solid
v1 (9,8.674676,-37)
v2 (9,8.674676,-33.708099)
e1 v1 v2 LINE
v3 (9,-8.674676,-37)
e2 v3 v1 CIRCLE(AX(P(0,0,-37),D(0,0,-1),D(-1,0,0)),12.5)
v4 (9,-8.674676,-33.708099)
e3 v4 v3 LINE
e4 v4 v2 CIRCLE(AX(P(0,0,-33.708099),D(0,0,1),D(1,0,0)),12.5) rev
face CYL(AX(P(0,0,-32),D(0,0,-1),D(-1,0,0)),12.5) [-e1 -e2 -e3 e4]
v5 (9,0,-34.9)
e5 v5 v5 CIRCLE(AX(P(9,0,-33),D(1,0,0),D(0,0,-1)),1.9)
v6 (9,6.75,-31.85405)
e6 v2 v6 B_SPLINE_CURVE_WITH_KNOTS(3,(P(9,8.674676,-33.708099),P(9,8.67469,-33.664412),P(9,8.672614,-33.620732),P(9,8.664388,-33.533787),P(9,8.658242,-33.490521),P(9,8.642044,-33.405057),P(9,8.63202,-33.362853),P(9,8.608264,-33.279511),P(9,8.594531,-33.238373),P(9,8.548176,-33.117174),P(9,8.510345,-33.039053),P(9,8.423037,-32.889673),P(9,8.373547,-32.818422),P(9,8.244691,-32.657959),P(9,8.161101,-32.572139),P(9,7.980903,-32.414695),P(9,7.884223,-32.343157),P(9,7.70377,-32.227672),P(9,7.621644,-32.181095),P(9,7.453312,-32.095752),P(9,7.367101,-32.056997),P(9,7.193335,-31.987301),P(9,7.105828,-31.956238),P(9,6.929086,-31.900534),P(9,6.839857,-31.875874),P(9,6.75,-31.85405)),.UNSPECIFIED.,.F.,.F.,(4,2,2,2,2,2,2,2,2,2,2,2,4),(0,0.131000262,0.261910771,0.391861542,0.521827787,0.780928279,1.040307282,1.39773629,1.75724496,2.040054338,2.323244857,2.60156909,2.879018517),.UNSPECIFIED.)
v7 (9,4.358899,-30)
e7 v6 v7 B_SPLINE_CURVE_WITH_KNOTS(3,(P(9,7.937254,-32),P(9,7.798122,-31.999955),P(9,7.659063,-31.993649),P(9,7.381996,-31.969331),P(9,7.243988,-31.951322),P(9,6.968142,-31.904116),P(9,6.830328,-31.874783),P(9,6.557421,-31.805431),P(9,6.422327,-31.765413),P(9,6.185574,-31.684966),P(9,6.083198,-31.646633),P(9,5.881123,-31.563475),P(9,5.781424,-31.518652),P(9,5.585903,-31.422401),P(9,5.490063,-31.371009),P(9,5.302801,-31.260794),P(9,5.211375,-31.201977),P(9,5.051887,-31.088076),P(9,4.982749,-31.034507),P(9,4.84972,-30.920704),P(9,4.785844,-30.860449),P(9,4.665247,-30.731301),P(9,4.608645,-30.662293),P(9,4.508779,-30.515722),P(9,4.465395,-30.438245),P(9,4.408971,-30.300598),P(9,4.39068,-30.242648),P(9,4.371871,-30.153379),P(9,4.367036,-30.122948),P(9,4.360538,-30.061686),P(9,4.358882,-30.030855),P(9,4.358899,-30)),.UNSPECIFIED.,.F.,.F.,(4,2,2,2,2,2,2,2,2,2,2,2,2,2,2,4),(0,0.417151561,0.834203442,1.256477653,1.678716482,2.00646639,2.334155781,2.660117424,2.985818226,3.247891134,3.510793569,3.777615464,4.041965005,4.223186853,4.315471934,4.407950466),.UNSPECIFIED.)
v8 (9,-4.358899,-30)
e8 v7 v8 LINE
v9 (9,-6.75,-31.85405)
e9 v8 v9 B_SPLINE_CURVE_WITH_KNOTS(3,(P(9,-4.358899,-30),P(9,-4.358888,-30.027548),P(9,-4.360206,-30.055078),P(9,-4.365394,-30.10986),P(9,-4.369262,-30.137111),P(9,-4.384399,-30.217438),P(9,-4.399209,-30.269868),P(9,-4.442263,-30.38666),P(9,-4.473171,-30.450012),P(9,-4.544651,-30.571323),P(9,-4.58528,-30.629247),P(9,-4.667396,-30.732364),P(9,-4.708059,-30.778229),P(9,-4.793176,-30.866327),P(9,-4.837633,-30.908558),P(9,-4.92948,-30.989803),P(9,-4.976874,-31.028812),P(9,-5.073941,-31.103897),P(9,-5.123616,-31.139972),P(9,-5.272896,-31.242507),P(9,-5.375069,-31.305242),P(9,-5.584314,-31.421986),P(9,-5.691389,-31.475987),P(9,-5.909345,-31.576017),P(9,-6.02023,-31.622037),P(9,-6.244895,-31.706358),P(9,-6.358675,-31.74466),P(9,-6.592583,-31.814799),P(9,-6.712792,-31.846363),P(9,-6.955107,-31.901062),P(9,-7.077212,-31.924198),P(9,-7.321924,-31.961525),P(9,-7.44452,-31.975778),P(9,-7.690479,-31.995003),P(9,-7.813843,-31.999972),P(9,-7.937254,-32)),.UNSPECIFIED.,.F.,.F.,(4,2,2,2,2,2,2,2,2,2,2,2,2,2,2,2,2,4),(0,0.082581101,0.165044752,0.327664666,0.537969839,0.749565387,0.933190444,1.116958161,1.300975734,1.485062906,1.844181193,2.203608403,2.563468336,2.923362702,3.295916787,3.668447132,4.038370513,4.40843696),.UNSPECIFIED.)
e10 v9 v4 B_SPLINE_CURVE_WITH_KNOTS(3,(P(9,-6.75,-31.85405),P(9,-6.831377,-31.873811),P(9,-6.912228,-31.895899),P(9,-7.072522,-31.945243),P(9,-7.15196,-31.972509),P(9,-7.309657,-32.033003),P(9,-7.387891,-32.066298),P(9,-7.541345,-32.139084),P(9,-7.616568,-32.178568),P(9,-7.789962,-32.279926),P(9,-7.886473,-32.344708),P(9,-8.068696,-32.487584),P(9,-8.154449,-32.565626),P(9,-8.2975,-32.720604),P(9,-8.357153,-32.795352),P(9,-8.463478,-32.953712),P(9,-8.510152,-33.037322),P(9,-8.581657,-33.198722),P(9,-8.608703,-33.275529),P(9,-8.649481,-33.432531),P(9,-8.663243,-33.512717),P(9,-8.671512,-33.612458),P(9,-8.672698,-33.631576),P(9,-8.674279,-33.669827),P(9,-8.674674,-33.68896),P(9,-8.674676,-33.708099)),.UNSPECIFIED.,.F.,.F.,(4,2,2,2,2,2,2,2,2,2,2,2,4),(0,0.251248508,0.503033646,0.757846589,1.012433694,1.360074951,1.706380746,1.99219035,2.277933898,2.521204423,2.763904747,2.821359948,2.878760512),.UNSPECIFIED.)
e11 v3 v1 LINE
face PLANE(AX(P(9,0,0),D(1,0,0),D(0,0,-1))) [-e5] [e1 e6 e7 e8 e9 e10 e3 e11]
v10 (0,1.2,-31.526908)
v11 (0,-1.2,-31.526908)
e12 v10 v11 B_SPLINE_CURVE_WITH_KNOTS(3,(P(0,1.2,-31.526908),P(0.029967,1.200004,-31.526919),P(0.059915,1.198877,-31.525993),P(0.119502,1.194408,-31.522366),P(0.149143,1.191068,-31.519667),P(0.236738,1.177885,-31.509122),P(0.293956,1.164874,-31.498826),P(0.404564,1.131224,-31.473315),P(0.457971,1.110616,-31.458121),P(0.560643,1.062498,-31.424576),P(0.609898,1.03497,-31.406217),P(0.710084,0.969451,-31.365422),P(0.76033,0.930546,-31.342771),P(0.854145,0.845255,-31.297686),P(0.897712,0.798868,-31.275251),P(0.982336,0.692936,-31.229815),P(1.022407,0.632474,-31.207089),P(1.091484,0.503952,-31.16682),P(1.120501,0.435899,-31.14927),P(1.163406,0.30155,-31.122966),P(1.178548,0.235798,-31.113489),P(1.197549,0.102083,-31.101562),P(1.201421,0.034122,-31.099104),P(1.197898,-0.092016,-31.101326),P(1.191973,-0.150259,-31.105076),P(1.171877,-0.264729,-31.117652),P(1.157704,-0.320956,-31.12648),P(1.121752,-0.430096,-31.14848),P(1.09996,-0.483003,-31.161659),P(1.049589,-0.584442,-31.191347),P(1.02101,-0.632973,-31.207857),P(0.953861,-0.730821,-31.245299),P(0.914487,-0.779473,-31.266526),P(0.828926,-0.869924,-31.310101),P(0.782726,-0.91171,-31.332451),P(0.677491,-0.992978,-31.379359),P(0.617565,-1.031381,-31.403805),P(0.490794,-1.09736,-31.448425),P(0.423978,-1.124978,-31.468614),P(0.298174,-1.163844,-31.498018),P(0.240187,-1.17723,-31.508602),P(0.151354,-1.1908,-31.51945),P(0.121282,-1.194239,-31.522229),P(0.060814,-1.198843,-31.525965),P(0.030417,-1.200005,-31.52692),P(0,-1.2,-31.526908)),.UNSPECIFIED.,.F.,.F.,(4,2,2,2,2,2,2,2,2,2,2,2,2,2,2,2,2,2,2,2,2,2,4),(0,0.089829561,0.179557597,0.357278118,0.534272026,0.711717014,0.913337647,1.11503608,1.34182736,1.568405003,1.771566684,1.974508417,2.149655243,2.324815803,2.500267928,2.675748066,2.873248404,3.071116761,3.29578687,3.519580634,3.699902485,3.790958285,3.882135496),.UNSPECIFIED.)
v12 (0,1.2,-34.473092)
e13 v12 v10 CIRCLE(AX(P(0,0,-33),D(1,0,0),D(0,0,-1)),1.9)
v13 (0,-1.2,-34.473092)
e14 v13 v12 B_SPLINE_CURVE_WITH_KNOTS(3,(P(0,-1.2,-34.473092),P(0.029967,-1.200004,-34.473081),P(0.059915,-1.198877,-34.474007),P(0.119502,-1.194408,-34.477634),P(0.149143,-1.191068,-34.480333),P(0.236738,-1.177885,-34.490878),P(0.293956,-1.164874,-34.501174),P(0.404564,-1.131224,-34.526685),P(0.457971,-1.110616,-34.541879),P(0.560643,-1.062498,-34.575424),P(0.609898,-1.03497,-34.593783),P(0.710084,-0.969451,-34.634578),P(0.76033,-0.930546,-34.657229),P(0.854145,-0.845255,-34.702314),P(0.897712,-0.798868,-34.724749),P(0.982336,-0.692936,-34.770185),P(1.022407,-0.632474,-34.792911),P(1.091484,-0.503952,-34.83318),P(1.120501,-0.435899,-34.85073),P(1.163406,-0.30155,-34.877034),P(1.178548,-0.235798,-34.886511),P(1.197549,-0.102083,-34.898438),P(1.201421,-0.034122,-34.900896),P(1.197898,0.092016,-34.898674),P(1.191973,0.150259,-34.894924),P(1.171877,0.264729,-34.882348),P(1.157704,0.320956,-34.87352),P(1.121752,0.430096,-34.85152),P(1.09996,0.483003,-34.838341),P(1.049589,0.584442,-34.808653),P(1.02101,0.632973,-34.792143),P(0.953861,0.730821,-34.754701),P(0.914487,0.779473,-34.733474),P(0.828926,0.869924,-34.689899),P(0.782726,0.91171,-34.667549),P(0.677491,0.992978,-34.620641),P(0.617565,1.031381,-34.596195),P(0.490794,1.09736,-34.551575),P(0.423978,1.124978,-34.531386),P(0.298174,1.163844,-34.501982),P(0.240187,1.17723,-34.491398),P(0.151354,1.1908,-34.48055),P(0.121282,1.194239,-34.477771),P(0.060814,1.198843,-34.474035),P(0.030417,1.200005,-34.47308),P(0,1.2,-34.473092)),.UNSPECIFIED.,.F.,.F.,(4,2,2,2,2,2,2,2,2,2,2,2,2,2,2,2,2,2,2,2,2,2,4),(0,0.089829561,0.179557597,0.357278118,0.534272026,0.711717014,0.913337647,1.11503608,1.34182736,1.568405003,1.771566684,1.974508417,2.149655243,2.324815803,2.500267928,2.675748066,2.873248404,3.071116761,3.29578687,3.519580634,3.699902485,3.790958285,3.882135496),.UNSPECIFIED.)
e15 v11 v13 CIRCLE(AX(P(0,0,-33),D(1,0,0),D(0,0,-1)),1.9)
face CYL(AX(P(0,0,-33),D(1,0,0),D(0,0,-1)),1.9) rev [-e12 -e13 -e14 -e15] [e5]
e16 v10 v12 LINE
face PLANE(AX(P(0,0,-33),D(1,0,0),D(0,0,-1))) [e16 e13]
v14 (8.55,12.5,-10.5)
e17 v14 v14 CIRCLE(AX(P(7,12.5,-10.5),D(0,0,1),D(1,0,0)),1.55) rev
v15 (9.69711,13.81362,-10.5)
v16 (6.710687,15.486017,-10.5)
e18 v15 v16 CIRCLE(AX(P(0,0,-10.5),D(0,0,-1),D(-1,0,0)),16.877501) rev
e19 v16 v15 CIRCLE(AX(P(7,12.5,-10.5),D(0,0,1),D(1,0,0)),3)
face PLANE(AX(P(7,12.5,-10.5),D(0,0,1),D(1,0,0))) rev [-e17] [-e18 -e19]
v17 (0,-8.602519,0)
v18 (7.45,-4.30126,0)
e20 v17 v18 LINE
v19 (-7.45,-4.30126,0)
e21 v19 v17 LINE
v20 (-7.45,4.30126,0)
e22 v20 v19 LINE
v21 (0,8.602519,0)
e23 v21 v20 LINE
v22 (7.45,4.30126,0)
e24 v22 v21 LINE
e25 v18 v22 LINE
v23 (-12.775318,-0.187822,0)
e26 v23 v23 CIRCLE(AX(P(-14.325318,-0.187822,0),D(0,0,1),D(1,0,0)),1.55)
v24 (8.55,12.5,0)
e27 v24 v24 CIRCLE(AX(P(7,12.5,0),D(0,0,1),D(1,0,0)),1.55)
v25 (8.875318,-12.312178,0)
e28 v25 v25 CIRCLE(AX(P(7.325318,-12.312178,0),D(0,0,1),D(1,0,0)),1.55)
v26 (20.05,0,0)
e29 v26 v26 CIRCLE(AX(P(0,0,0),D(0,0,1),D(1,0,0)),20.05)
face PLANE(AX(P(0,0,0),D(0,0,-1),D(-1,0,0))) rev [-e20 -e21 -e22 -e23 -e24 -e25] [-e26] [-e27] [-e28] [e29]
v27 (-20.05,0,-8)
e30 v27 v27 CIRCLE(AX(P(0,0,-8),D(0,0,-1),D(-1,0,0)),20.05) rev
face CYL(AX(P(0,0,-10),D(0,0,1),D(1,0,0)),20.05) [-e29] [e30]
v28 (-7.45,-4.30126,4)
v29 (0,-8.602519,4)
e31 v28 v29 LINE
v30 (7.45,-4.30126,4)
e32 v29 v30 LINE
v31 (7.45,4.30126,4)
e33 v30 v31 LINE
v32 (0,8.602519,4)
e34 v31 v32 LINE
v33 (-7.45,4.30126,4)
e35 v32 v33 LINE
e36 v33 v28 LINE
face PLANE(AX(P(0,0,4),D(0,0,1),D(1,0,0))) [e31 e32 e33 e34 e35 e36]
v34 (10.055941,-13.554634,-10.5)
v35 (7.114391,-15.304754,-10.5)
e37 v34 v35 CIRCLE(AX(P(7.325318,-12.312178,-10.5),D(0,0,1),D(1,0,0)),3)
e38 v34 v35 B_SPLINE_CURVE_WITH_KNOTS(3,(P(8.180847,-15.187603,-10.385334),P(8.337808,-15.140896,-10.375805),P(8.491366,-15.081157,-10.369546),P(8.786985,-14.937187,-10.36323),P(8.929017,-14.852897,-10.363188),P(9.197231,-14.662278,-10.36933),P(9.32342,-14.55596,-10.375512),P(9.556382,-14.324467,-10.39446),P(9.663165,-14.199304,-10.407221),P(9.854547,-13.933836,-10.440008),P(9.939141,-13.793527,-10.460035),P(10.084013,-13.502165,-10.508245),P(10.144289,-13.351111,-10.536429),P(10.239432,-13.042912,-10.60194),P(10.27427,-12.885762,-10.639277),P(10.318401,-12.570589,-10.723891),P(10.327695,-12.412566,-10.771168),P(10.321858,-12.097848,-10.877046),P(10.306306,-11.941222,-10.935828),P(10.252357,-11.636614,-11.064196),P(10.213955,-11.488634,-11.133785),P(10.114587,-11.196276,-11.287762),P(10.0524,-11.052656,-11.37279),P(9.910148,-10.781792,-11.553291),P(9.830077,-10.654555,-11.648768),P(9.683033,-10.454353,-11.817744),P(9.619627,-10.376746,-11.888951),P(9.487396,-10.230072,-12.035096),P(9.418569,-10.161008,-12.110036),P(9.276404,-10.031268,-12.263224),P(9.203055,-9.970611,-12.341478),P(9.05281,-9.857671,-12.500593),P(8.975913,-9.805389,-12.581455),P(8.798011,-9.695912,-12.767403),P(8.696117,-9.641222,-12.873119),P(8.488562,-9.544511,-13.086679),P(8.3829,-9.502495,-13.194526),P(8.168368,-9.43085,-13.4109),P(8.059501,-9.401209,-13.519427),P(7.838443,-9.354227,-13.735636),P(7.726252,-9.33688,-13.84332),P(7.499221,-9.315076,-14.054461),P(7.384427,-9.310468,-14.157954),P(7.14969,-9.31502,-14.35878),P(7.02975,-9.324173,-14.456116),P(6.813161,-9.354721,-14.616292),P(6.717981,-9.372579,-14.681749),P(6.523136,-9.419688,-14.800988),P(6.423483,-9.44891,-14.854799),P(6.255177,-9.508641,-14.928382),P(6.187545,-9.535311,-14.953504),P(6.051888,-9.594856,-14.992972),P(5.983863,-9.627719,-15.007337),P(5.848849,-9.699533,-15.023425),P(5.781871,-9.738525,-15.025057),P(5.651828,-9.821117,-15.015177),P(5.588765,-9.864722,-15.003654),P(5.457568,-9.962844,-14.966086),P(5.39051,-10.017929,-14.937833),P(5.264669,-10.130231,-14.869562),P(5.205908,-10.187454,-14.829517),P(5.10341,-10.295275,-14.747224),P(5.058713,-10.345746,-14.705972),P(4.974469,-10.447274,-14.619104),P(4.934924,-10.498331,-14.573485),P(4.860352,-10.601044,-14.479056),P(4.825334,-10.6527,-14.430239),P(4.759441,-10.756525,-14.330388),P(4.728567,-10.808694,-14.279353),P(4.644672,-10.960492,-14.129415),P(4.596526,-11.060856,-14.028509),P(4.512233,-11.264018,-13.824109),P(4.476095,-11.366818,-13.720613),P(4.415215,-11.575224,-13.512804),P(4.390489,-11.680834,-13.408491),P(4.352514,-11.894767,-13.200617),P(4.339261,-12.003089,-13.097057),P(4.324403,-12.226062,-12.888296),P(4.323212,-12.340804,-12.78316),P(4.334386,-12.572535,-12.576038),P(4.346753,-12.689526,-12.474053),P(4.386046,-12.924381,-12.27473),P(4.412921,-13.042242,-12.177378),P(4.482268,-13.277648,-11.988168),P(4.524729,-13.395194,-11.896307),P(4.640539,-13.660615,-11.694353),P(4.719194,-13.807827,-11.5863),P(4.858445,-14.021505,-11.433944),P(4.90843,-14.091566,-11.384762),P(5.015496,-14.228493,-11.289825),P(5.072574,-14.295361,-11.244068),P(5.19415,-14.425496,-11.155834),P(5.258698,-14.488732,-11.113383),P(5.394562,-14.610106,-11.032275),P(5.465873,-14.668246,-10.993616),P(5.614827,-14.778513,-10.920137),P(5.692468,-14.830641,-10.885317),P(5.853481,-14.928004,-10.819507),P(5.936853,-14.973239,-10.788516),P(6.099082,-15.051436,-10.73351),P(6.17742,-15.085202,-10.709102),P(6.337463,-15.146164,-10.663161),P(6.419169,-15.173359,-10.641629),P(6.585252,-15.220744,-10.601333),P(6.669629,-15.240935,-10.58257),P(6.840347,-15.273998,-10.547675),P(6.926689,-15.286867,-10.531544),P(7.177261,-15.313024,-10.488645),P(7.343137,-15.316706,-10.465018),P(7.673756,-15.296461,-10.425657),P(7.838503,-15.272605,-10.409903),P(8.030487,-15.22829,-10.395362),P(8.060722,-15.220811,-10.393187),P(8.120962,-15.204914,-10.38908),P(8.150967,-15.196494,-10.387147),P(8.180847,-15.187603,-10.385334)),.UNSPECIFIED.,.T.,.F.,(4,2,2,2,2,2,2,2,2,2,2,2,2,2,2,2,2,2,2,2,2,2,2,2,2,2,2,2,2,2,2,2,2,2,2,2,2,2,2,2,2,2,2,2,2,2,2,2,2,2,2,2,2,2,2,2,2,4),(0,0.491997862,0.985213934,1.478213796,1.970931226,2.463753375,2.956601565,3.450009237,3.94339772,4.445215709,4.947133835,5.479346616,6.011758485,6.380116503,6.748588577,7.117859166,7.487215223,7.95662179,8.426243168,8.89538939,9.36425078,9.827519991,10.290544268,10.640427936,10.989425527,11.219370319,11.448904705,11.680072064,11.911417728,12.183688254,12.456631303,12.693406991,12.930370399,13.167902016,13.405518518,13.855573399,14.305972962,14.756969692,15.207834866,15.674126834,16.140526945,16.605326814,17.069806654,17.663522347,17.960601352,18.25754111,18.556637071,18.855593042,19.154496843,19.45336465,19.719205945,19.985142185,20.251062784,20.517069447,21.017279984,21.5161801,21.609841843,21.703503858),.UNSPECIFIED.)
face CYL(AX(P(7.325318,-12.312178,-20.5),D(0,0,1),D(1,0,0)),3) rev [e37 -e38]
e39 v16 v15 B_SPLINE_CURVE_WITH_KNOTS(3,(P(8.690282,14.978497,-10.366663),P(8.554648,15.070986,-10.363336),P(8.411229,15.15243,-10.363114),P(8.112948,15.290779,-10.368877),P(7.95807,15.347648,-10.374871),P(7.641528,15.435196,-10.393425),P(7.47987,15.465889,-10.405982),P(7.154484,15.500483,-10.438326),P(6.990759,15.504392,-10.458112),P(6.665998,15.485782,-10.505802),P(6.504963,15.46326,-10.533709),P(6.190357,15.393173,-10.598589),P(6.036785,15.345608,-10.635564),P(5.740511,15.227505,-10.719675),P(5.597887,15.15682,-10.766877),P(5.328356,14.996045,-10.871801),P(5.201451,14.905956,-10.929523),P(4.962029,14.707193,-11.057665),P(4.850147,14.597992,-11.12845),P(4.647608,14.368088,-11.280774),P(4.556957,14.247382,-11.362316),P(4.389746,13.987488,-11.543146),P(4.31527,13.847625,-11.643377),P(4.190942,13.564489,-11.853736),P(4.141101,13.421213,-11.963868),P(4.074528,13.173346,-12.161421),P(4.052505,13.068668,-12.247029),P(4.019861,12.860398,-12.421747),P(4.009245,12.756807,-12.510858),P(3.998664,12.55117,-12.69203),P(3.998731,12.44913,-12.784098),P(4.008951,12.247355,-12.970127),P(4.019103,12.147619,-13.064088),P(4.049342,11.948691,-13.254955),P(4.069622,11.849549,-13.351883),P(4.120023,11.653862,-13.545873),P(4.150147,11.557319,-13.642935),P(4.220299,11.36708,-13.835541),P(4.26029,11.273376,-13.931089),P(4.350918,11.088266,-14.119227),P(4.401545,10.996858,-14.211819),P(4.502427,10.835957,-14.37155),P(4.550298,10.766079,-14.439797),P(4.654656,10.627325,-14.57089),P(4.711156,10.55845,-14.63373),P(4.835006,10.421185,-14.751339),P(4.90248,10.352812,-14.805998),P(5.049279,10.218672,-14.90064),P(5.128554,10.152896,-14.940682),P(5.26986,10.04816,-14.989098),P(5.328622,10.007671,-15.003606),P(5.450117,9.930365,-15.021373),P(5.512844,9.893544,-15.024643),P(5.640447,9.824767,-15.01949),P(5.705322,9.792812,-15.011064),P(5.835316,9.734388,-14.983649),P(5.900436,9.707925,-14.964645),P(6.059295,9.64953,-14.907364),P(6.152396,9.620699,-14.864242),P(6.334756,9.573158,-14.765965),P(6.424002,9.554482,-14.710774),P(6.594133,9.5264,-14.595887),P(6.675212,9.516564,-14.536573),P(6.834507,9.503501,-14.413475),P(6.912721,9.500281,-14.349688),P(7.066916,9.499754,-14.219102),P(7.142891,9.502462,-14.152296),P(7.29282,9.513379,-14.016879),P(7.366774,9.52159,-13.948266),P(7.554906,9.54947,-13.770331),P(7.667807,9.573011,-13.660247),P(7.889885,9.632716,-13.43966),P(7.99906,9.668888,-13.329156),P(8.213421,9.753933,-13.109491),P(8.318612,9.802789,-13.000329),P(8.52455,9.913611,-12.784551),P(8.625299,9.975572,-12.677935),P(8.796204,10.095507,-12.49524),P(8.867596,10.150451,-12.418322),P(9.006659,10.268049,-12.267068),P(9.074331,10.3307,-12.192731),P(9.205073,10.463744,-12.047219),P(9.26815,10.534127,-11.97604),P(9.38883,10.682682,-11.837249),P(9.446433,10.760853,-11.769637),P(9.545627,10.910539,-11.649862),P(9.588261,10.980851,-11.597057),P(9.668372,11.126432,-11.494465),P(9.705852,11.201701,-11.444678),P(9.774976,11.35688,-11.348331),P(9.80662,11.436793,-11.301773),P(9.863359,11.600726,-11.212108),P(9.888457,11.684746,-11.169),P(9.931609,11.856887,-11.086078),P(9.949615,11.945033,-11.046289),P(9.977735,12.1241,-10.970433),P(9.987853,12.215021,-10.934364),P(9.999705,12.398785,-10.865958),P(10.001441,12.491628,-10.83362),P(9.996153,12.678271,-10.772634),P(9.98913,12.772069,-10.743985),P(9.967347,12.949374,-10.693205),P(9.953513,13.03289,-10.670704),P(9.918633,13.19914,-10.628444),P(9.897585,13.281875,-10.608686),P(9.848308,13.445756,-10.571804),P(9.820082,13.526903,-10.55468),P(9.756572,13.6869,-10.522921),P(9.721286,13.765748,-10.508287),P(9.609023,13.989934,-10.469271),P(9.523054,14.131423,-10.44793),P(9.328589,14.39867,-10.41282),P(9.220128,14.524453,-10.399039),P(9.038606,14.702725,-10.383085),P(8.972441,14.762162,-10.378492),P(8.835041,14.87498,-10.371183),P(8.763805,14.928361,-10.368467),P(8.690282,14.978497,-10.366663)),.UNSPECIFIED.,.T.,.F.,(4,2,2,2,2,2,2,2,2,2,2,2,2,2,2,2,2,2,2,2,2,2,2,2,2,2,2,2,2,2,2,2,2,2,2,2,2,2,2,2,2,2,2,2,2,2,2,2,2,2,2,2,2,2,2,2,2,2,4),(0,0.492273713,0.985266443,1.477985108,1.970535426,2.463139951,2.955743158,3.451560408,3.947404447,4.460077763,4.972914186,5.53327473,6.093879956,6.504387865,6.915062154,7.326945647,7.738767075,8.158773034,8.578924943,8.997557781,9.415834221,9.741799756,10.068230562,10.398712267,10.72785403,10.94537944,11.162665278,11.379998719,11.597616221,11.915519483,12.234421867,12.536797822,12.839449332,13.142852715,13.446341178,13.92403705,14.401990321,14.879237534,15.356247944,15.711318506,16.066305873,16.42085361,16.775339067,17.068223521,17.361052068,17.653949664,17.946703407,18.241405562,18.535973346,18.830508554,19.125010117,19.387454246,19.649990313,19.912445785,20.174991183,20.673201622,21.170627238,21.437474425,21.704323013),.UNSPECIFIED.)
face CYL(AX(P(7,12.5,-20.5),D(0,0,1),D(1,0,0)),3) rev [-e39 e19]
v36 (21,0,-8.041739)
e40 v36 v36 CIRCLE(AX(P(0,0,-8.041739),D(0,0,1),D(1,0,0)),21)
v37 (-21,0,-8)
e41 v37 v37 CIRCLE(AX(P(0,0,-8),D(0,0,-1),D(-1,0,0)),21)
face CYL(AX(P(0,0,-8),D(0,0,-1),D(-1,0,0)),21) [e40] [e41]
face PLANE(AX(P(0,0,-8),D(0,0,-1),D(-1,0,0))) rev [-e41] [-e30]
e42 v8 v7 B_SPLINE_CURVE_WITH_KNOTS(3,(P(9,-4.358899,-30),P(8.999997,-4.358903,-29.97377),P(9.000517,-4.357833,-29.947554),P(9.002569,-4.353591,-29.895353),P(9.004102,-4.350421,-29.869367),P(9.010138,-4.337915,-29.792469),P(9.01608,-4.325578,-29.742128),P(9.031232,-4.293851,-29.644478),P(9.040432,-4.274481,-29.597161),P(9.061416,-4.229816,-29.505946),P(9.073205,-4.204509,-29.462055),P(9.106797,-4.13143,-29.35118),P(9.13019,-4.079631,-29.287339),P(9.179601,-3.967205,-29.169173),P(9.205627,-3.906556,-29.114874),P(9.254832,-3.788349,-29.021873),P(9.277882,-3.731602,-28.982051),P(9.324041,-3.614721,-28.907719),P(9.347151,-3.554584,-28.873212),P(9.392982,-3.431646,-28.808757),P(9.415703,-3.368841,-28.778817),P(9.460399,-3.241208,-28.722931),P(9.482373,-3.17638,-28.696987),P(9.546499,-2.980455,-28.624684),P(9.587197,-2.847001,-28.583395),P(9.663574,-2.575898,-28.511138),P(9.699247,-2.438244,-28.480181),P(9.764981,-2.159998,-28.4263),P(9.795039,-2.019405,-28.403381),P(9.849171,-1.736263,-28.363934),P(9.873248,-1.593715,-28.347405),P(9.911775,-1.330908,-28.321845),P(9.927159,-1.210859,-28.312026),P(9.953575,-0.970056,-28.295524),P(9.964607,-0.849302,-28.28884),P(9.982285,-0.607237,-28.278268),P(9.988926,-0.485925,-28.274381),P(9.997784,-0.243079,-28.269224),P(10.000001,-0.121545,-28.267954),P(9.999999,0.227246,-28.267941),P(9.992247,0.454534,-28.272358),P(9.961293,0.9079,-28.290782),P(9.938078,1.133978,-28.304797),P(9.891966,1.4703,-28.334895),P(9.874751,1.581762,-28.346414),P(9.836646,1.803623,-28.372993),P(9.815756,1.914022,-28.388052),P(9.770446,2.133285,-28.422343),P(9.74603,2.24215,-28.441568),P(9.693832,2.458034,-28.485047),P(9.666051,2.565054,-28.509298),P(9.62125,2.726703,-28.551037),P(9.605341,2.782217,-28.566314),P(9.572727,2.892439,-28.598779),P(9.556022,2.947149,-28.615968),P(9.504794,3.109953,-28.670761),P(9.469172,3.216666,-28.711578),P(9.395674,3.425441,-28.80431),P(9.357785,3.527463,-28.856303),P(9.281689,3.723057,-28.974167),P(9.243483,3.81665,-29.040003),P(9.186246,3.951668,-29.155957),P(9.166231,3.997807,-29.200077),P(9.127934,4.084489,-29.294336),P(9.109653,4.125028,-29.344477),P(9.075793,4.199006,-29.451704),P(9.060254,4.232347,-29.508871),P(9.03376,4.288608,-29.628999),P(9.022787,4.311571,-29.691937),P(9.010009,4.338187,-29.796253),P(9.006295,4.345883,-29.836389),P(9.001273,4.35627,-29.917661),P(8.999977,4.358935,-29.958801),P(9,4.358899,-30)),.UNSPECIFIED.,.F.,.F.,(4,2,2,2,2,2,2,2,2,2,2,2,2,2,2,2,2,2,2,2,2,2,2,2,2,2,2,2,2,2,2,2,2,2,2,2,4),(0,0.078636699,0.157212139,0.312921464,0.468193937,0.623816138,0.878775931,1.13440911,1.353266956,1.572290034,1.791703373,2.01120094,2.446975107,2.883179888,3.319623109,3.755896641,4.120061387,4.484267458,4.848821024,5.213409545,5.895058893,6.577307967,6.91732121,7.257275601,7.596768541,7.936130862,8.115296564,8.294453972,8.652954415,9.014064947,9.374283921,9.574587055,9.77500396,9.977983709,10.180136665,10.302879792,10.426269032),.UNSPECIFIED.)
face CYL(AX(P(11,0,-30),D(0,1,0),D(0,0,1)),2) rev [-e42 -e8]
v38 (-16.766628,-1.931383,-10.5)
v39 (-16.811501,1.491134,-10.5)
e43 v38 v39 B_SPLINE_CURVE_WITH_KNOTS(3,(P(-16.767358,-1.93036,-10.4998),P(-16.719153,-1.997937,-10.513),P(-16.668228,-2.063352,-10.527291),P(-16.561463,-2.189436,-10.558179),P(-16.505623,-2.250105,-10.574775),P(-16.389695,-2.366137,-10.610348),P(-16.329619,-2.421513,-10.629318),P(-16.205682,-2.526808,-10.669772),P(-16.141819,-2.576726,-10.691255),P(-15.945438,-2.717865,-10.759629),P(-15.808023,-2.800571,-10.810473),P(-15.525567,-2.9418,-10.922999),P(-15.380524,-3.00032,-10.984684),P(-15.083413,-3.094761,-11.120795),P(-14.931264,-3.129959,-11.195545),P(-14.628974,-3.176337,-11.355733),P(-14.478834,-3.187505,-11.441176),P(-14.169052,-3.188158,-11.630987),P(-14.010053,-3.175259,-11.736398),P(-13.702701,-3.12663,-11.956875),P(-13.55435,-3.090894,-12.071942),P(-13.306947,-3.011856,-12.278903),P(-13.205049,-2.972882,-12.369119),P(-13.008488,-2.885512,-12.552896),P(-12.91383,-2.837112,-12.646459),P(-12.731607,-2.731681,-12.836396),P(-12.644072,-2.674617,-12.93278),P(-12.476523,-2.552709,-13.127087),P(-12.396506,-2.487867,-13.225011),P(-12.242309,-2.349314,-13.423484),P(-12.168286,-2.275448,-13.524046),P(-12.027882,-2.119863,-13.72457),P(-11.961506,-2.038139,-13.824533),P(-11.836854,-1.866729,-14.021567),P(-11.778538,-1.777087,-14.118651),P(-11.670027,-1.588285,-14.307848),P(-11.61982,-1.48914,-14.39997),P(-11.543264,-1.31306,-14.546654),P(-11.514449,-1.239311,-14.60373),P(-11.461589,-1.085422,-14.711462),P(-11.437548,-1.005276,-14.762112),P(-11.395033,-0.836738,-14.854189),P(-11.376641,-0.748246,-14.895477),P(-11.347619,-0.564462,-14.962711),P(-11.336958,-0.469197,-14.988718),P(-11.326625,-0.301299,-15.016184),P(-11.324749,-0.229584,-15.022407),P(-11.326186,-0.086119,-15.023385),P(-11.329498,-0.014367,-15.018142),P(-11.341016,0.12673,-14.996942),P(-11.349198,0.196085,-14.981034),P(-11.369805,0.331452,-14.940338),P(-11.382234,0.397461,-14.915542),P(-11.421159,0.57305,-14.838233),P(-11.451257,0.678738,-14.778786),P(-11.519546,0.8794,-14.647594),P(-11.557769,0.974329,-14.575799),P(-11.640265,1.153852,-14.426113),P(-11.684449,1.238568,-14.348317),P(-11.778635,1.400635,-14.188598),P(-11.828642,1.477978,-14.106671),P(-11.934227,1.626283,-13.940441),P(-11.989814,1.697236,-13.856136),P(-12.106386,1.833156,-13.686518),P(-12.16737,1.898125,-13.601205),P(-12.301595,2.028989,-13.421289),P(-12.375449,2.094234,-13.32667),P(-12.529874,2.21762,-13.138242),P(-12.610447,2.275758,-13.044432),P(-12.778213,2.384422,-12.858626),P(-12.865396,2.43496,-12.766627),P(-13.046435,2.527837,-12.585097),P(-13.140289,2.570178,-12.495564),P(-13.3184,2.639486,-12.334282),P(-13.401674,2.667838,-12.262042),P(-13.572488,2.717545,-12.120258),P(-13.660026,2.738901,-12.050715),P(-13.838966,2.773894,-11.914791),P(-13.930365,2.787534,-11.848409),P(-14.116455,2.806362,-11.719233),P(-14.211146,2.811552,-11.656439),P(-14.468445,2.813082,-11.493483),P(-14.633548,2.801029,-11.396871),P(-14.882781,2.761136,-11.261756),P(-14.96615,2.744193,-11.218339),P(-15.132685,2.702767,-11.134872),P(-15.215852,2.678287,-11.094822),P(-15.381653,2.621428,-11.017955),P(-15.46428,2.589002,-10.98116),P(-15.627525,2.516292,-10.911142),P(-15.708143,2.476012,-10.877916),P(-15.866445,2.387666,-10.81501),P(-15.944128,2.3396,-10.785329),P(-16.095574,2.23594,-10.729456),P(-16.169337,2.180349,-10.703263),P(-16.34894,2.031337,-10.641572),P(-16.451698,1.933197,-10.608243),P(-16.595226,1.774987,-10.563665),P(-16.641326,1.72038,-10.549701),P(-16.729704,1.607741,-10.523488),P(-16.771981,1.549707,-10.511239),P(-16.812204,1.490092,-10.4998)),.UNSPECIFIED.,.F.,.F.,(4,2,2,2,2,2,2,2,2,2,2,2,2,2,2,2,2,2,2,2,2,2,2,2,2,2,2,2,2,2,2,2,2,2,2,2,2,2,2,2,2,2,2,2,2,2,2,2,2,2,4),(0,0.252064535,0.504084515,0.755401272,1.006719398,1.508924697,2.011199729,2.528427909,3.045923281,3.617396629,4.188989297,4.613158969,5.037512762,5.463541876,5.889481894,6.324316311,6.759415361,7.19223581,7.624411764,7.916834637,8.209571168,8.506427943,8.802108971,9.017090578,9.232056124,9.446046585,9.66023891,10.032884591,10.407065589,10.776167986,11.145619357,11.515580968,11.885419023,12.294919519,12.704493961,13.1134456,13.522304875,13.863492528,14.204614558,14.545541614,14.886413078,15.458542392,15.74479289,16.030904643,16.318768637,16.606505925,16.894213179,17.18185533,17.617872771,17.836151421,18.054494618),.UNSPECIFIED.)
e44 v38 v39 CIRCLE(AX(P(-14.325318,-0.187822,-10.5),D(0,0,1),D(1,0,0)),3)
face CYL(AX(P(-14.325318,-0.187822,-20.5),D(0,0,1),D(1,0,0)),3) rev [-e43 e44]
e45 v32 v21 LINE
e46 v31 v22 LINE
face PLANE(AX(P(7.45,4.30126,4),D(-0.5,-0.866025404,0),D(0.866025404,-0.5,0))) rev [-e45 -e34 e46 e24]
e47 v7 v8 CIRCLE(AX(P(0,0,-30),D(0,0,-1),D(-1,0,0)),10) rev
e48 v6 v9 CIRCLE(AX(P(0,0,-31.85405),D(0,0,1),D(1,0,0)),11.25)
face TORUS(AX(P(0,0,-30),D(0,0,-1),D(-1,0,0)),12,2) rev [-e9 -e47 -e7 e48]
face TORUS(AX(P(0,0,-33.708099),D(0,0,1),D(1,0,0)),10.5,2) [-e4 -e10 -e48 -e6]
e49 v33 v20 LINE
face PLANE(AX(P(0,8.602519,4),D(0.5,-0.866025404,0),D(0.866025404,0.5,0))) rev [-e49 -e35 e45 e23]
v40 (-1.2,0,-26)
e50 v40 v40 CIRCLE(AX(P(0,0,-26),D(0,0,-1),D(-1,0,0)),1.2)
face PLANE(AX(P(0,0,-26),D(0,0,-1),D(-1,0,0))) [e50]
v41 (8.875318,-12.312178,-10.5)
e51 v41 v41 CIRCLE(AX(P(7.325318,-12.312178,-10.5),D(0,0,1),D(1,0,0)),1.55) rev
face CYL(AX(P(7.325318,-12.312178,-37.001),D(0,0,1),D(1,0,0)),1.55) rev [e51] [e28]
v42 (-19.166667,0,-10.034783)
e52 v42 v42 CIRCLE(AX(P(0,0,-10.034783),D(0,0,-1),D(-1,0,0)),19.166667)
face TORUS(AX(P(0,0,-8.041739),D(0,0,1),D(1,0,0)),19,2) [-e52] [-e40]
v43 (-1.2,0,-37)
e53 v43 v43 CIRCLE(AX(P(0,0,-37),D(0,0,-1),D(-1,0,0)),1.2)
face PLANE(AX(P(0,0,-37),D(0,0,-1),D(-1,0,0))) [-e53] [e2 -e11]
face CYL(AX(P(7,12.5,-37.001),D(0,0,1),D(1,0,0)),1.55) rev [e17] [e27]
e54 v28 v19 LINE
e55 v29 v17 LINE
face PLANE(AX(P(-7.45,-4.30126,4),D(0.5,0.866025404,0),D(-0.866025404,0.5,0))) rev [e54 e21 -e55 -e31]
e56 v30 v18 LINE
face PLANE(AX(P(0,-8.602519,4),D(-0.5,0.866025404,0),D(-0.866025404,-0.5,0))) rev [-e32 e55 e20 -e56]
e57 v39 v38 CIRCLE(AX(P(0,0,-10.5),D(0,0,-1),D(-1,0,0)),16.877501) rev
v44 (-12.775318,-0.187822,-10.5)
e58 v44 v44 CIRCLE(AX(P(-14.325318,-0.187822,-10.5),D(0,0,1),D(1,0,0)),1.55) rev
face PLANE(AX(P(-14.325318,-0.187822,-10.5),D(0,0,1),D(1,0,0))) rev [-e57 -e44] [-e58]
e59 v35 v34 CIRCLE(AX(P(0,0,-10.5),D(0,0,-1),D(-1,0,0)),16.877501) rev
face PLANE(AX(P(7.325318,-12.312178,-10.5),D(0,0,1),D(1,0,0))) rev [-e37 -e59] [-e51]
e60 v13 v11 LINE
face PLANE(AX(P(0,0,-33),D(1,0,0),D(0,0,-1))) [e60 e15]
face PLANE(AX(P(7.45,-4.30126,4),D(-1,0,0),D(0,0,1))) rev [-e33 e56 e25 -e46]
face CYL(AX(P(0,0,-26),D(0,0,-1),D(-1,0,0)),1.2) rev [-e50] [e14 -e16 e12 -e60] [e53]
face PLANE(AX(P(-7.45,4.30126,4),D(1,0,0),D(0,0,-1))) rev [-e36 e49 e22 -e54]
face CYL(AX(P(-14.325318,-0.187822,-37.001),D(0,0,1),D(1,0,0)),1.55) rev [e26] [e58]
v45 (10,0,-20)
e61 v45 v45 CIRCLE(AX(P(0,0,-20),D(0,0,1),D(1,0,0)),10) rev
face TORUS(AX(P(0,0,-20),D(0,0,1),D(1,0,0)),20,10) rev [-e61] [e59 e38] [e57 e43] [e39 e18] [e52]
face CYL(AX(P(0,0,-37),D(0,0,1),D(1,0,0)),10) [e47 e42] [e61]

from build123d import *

# Parameters (mm, degrees)
BOSS_EXTRUDE1_DEPTH = 4
SKETCH2_R           = 10
BOSS_EXTRUDE2_DEPTH = 37
SKETCH3_R           = 1.2
CUT_EXTRUDE2_DEPTH  = 11
SKETCH6_R           = 20.05
BOSS_EXTRUDE4_DEPTH = 10
SKETCH15_R          = 21
BOSS_EXTRUDE7_DEPTH = 2
CUT_EXTRUDE4_REACH  = 49.445
SKETCH7_R           = 1.55
BOSS_EXTRUDE6_START = -5
SKETCH14_R          = 12.5
SKETCH14_R_2        = 10
BOSS_EXTRUDE6_DEPTH = 5
CUT_EXTRUDE5_REACH  = 54.058
SKETCH12_W          = 9
SKETCH12_H          = 20
SKETCH13_R          = 1.9
CUT_EXTRUDE6_DEPTH  = 9
FILLET1_R           = 10
FILLET2_R           = 2
FILLET3_R           = 2
FILLET4_R           = 2
FILLET5_R           = 2
SKETCH17_R          = 3
CUT_EXTRUDE8_DEPTH  = 10


# Some blends are built 0.0001 mm under size
with BuildPart() as part:
    # Sketch1 → Boss-Extrude1 (new body)
    with BuildSketch(Plane.XY):
        Polygon((0, 8.602519011), (-7.45, 4.301259505), (-7.45, -4.301259505), (0, -8.602519011), (7.45, -4.301259505), (7.45, 4.301259505), align=None)
    extrude(amount=BOSS_EXTRUDE1_DEPTH)

    # Sketch2 → Boss-Extrude2 (add)
    with BuildSketch(Plane(origin=(0, 0, 0), x_dir=(-1, 0, 0), z_dir=(0, 0, -1))):
        Circle(SKETCH2_R)
    extrude(amount=BOSS_EXTRUDE2_DEPTH)

    # Sketch3 → Cut-Extrude2 (cut)
    with BuildSketch(Plane(origin=(0, 0, -37), x_dir=(-1, 0, 0), z_dir=(0, 0, -1))):
        Circle(SKETCH3_R)
    extrude(amount=-CUT_EXTRUDE2_DEPTH, mode=Mode.SUBTRACT)

    # Sketch6 → Boss-Extrude4 (add)
    with BuildSketch(Plane.XY):
        Circle(SKETCH6_R)
    extrude(amount=-BOSS_EXTRUDE4_DEPTH)

    # Sketch15 → Boss-Extrude7 (add)
    with BuildSketch(Plane(origin=(0, 0, -10), x_dir=(-1, 0, 0), z_dir=(0, 0, -1))):
        Circle(SKETCH15_R)
    extrude(amount=-BOSS_EXTRUDE7_DEPTH)

    # Sketch7 → Cut-Extrude4 (cut, up to next)
    with BuildSketch(Plane.XY, mode=Mode.PRIVATE) as cut_extrude4_sk1:
        with Locations((7, 12.5)):
            Circle(SKETCH7_R)
    cut_extrude4_tool1 = extrude(cut_extrude4_sk1.sketch, amount=-CUT_EXTRUDE4_REACH, mode=Mode.PRIVATE) & part.part
    # Sketch7 → Cut-Extrude4 (cut, up to next)
    with BuildSketch(Plane.XY, mode=Mode.PRIVATE) as cut_extrude4_sk2:
        with Locations((7.325317547, -12.312177826)):
            Circle(SKETCH7_R)
    cut_extrude4_tool2 = extrude(cut_extrude4_sk2.sketch, amount=-CUT_EXTRUDE4_REACH, mode=Mode.PRIVATE) & part.part
    # Sketch7 → Cut-Extrude4 (cut, up to next)
    with BuildSketch(Plane.XY, mode=Mode.PRIVATE) as cut_extrude4_sk3:
        with Locations((-14.325317547, -0.187822174)):
            Circle(SKETCH7_R)
    cut_extrude4_tool3 = extrude(cut_extrude4_sk3.sketch, amount=-CUT_EXTRUDE4_REACH, mode=Mode.PRIVATE) & part.part
    add(cut_extrude4_tool1.solids().sort_by_distance((7, 12.5, 0))[0], mode=Mode.SUBTRACT)
    add(cut_extrude4_tool2.solids().sort_by_distance((7.325318, -12.312178, 0))[0], mode=Mode.SUBTRACT)
    add(cut_extrude4_tool3.solids().sort_by_distance((-14.325318, -0.187822, 0))[0], mode=Mode.SUBTRACT)

    # Sketch14 → Boss-Extrude6 (add)
    with BuildSketch(Plane(origin=(0, 0, -37), x_dir=(-1, 0, 0), z_dir=(0, 0, -1)).offset(BOSS_EXTRUDE6_START)):
        Circle(SKETCH14_R)
        with Locations(Location((0, 0, 0), (0, 0, 180))):
            Circle(SKETCH14_R_2, mode=Mode.SUBTRACT)
    extrude(amount=BOSS_EXTRUDE6_DEPTH)

    # Sketch12 → Cut-Extrude5 (cut, up to next)
    with BuildSketch(Plane(origin=(9, 0, 0), x_dir=(0, 0, -1), z_dir=(1, 0, 0)), mode=Mode.PRIVATE) as cut_extrude5_sk1:
        with Locations((32.5, 0)):
            Rectangle(SKETCH12_W, SKETCH12_H)
    cut_extrude5_tool1 = extrude(cut_extrude5_sk1.sketch, amount=CUT_EXTRUDE5_REACH, mode=Mode.PRIVATE) & part.part
    add(cut_extrude5_tool1.solids().sort_by_distance((9, 0, -32.5))[0], mode=Mode.SUBTRACT)

    # Sketch13 → Cut-Extrude6 (cut, symmetric)
    with BuildSketch(Plane(origin=(9, 0, 0), x_dir=(0, 0, -1), z_dir=(1, 0, 0))):
        with Locations((33, 0)):
            Circle(SKETCH13_R)
    extrude(amount=CUT_EXTRUDE6_DEPTH, both=True, mode=Mode.SUBTRACT)

    # Fillet1
    # the kernel refuses this fillet: 10 mm, written as the material it adds along each edge
    with BuildSketch(Plane(origin=(0, 0, -10), x_dir=(-1, 0, 0), z_dir=(0, 1, 0))) as fillet1_piece_1_section:
        with BuildLine():
            CenterArc((10 + FILLET1_R, -FILLET1_R), FILLET1_R, 90, 90)
            Line((10, -FILLET1_R), (10, 0))
            Line((10, 0), (10 + FILLET1_R, 0))
        make_face()
    fillet1_piece_1 = revolve(axis=Axis((0, 0, -10), (0, 0, 1)), mode=Mode.PRIVATE)
    fillet1_piece_1 = fillet1_piece_1 - Plane(origin=(7.325317547, -12.312177826, -12.841052518), x_dir=(1, 0, 0), z_dir=(0, 0, 1)) * Cylinder(1.55, 80, mode=Mode.PRIVATE)
    fillet1_piece_1 = fillet1_piece_1 - Plane(origin=(-14.325317547, -0.187822174, -12.841052518), x_dir=(1, 0, 0), z_dir=(0, 0, 1)) * Cylinder(1.55, 80, mode=Mode.PRIVATE)
    fillet1_piece_1 = fillet1_piece_1 - Plane(origin=(7, 12.5, -12.841052518), x_dir=(1, 0, 0), z_dir=(0, 0, 1)) * Cylinder(1.55, 80, mode=Mode.PRIVATE)
    add(fillet1_piece_1)

    # Fillet2
    fillet2_edges = [part.edges().sort_by_distance(p)[0] for p in [
        (21, 0, -10),
    ]]
    fillet(fillet2_edges, radius=FILLET2_R - 0.0001)  # a hair under: the kernel refuses the full size

    # Fillet3
    fillet3_edges = [part.edges().sort_by_distance(p)[0] for p in [
        (-2.236067977, 9.746794345, -32),
    ]]
    fillet(fillet3_edges, radius=FILLET3_R)

    # Fillet4
    # the kernel refuses this fillet: 2 mm, written as the material it adds along each edge
    with BuildSketch(Plane(origin=(9, 9.358898944, -28), x_dir=(1, 0, 0), z_dir=(0, -1, 0))) as fillet4_piece_1_section:
        with BuildLine():
            CenterArc((FILLET4_R, -FILLET4_R), FILLET4_R, 90, 90)
            Line((0, -FILLET4_R), (0, 0))
            Line((0, 0), (FILLET4_R, 0))
        make_face()
    fillet4_piece_1 = extrude(amount=18.717797887, mode=Mode.PRIVATE)
    fillet4_piece_1 = fillet4_piece_1 & Plane(origin=(0, 0, -28.566638375), x_dir=(-1, 0, 0), z_dir=(0, 0, 1)) * Cylinder(10, 46, mode=Mode.PRIVATE)
    add(fillet4_piece_1)

    # Fillet5
    fillet5_edges = [part.edges().sort_by_distance(p)[0] for p in [
        (-12.5, 0, -32),
    ]]
    fillet(fillet5_edges, radius=FILLET5_R)

    # Sketch17 → Cut-Extrude8 (cut)
    with BuildSketch(Plane.XY.offset(-10.5)):
        with Locations((7, 12.5)):
            Circle(SKETCH17_R)
        with Locations((7.325317547, -12.312177826)):
            Circle(SKETCH17_R)
        with Locations((-14.325317547, -0.187822174)):
            Circle(SKETCH17_R)
    extrude(amount=-CUT_EXTRUDE8_DEPTH, mode=Mode.SUBTRACT)


solid = part.part
